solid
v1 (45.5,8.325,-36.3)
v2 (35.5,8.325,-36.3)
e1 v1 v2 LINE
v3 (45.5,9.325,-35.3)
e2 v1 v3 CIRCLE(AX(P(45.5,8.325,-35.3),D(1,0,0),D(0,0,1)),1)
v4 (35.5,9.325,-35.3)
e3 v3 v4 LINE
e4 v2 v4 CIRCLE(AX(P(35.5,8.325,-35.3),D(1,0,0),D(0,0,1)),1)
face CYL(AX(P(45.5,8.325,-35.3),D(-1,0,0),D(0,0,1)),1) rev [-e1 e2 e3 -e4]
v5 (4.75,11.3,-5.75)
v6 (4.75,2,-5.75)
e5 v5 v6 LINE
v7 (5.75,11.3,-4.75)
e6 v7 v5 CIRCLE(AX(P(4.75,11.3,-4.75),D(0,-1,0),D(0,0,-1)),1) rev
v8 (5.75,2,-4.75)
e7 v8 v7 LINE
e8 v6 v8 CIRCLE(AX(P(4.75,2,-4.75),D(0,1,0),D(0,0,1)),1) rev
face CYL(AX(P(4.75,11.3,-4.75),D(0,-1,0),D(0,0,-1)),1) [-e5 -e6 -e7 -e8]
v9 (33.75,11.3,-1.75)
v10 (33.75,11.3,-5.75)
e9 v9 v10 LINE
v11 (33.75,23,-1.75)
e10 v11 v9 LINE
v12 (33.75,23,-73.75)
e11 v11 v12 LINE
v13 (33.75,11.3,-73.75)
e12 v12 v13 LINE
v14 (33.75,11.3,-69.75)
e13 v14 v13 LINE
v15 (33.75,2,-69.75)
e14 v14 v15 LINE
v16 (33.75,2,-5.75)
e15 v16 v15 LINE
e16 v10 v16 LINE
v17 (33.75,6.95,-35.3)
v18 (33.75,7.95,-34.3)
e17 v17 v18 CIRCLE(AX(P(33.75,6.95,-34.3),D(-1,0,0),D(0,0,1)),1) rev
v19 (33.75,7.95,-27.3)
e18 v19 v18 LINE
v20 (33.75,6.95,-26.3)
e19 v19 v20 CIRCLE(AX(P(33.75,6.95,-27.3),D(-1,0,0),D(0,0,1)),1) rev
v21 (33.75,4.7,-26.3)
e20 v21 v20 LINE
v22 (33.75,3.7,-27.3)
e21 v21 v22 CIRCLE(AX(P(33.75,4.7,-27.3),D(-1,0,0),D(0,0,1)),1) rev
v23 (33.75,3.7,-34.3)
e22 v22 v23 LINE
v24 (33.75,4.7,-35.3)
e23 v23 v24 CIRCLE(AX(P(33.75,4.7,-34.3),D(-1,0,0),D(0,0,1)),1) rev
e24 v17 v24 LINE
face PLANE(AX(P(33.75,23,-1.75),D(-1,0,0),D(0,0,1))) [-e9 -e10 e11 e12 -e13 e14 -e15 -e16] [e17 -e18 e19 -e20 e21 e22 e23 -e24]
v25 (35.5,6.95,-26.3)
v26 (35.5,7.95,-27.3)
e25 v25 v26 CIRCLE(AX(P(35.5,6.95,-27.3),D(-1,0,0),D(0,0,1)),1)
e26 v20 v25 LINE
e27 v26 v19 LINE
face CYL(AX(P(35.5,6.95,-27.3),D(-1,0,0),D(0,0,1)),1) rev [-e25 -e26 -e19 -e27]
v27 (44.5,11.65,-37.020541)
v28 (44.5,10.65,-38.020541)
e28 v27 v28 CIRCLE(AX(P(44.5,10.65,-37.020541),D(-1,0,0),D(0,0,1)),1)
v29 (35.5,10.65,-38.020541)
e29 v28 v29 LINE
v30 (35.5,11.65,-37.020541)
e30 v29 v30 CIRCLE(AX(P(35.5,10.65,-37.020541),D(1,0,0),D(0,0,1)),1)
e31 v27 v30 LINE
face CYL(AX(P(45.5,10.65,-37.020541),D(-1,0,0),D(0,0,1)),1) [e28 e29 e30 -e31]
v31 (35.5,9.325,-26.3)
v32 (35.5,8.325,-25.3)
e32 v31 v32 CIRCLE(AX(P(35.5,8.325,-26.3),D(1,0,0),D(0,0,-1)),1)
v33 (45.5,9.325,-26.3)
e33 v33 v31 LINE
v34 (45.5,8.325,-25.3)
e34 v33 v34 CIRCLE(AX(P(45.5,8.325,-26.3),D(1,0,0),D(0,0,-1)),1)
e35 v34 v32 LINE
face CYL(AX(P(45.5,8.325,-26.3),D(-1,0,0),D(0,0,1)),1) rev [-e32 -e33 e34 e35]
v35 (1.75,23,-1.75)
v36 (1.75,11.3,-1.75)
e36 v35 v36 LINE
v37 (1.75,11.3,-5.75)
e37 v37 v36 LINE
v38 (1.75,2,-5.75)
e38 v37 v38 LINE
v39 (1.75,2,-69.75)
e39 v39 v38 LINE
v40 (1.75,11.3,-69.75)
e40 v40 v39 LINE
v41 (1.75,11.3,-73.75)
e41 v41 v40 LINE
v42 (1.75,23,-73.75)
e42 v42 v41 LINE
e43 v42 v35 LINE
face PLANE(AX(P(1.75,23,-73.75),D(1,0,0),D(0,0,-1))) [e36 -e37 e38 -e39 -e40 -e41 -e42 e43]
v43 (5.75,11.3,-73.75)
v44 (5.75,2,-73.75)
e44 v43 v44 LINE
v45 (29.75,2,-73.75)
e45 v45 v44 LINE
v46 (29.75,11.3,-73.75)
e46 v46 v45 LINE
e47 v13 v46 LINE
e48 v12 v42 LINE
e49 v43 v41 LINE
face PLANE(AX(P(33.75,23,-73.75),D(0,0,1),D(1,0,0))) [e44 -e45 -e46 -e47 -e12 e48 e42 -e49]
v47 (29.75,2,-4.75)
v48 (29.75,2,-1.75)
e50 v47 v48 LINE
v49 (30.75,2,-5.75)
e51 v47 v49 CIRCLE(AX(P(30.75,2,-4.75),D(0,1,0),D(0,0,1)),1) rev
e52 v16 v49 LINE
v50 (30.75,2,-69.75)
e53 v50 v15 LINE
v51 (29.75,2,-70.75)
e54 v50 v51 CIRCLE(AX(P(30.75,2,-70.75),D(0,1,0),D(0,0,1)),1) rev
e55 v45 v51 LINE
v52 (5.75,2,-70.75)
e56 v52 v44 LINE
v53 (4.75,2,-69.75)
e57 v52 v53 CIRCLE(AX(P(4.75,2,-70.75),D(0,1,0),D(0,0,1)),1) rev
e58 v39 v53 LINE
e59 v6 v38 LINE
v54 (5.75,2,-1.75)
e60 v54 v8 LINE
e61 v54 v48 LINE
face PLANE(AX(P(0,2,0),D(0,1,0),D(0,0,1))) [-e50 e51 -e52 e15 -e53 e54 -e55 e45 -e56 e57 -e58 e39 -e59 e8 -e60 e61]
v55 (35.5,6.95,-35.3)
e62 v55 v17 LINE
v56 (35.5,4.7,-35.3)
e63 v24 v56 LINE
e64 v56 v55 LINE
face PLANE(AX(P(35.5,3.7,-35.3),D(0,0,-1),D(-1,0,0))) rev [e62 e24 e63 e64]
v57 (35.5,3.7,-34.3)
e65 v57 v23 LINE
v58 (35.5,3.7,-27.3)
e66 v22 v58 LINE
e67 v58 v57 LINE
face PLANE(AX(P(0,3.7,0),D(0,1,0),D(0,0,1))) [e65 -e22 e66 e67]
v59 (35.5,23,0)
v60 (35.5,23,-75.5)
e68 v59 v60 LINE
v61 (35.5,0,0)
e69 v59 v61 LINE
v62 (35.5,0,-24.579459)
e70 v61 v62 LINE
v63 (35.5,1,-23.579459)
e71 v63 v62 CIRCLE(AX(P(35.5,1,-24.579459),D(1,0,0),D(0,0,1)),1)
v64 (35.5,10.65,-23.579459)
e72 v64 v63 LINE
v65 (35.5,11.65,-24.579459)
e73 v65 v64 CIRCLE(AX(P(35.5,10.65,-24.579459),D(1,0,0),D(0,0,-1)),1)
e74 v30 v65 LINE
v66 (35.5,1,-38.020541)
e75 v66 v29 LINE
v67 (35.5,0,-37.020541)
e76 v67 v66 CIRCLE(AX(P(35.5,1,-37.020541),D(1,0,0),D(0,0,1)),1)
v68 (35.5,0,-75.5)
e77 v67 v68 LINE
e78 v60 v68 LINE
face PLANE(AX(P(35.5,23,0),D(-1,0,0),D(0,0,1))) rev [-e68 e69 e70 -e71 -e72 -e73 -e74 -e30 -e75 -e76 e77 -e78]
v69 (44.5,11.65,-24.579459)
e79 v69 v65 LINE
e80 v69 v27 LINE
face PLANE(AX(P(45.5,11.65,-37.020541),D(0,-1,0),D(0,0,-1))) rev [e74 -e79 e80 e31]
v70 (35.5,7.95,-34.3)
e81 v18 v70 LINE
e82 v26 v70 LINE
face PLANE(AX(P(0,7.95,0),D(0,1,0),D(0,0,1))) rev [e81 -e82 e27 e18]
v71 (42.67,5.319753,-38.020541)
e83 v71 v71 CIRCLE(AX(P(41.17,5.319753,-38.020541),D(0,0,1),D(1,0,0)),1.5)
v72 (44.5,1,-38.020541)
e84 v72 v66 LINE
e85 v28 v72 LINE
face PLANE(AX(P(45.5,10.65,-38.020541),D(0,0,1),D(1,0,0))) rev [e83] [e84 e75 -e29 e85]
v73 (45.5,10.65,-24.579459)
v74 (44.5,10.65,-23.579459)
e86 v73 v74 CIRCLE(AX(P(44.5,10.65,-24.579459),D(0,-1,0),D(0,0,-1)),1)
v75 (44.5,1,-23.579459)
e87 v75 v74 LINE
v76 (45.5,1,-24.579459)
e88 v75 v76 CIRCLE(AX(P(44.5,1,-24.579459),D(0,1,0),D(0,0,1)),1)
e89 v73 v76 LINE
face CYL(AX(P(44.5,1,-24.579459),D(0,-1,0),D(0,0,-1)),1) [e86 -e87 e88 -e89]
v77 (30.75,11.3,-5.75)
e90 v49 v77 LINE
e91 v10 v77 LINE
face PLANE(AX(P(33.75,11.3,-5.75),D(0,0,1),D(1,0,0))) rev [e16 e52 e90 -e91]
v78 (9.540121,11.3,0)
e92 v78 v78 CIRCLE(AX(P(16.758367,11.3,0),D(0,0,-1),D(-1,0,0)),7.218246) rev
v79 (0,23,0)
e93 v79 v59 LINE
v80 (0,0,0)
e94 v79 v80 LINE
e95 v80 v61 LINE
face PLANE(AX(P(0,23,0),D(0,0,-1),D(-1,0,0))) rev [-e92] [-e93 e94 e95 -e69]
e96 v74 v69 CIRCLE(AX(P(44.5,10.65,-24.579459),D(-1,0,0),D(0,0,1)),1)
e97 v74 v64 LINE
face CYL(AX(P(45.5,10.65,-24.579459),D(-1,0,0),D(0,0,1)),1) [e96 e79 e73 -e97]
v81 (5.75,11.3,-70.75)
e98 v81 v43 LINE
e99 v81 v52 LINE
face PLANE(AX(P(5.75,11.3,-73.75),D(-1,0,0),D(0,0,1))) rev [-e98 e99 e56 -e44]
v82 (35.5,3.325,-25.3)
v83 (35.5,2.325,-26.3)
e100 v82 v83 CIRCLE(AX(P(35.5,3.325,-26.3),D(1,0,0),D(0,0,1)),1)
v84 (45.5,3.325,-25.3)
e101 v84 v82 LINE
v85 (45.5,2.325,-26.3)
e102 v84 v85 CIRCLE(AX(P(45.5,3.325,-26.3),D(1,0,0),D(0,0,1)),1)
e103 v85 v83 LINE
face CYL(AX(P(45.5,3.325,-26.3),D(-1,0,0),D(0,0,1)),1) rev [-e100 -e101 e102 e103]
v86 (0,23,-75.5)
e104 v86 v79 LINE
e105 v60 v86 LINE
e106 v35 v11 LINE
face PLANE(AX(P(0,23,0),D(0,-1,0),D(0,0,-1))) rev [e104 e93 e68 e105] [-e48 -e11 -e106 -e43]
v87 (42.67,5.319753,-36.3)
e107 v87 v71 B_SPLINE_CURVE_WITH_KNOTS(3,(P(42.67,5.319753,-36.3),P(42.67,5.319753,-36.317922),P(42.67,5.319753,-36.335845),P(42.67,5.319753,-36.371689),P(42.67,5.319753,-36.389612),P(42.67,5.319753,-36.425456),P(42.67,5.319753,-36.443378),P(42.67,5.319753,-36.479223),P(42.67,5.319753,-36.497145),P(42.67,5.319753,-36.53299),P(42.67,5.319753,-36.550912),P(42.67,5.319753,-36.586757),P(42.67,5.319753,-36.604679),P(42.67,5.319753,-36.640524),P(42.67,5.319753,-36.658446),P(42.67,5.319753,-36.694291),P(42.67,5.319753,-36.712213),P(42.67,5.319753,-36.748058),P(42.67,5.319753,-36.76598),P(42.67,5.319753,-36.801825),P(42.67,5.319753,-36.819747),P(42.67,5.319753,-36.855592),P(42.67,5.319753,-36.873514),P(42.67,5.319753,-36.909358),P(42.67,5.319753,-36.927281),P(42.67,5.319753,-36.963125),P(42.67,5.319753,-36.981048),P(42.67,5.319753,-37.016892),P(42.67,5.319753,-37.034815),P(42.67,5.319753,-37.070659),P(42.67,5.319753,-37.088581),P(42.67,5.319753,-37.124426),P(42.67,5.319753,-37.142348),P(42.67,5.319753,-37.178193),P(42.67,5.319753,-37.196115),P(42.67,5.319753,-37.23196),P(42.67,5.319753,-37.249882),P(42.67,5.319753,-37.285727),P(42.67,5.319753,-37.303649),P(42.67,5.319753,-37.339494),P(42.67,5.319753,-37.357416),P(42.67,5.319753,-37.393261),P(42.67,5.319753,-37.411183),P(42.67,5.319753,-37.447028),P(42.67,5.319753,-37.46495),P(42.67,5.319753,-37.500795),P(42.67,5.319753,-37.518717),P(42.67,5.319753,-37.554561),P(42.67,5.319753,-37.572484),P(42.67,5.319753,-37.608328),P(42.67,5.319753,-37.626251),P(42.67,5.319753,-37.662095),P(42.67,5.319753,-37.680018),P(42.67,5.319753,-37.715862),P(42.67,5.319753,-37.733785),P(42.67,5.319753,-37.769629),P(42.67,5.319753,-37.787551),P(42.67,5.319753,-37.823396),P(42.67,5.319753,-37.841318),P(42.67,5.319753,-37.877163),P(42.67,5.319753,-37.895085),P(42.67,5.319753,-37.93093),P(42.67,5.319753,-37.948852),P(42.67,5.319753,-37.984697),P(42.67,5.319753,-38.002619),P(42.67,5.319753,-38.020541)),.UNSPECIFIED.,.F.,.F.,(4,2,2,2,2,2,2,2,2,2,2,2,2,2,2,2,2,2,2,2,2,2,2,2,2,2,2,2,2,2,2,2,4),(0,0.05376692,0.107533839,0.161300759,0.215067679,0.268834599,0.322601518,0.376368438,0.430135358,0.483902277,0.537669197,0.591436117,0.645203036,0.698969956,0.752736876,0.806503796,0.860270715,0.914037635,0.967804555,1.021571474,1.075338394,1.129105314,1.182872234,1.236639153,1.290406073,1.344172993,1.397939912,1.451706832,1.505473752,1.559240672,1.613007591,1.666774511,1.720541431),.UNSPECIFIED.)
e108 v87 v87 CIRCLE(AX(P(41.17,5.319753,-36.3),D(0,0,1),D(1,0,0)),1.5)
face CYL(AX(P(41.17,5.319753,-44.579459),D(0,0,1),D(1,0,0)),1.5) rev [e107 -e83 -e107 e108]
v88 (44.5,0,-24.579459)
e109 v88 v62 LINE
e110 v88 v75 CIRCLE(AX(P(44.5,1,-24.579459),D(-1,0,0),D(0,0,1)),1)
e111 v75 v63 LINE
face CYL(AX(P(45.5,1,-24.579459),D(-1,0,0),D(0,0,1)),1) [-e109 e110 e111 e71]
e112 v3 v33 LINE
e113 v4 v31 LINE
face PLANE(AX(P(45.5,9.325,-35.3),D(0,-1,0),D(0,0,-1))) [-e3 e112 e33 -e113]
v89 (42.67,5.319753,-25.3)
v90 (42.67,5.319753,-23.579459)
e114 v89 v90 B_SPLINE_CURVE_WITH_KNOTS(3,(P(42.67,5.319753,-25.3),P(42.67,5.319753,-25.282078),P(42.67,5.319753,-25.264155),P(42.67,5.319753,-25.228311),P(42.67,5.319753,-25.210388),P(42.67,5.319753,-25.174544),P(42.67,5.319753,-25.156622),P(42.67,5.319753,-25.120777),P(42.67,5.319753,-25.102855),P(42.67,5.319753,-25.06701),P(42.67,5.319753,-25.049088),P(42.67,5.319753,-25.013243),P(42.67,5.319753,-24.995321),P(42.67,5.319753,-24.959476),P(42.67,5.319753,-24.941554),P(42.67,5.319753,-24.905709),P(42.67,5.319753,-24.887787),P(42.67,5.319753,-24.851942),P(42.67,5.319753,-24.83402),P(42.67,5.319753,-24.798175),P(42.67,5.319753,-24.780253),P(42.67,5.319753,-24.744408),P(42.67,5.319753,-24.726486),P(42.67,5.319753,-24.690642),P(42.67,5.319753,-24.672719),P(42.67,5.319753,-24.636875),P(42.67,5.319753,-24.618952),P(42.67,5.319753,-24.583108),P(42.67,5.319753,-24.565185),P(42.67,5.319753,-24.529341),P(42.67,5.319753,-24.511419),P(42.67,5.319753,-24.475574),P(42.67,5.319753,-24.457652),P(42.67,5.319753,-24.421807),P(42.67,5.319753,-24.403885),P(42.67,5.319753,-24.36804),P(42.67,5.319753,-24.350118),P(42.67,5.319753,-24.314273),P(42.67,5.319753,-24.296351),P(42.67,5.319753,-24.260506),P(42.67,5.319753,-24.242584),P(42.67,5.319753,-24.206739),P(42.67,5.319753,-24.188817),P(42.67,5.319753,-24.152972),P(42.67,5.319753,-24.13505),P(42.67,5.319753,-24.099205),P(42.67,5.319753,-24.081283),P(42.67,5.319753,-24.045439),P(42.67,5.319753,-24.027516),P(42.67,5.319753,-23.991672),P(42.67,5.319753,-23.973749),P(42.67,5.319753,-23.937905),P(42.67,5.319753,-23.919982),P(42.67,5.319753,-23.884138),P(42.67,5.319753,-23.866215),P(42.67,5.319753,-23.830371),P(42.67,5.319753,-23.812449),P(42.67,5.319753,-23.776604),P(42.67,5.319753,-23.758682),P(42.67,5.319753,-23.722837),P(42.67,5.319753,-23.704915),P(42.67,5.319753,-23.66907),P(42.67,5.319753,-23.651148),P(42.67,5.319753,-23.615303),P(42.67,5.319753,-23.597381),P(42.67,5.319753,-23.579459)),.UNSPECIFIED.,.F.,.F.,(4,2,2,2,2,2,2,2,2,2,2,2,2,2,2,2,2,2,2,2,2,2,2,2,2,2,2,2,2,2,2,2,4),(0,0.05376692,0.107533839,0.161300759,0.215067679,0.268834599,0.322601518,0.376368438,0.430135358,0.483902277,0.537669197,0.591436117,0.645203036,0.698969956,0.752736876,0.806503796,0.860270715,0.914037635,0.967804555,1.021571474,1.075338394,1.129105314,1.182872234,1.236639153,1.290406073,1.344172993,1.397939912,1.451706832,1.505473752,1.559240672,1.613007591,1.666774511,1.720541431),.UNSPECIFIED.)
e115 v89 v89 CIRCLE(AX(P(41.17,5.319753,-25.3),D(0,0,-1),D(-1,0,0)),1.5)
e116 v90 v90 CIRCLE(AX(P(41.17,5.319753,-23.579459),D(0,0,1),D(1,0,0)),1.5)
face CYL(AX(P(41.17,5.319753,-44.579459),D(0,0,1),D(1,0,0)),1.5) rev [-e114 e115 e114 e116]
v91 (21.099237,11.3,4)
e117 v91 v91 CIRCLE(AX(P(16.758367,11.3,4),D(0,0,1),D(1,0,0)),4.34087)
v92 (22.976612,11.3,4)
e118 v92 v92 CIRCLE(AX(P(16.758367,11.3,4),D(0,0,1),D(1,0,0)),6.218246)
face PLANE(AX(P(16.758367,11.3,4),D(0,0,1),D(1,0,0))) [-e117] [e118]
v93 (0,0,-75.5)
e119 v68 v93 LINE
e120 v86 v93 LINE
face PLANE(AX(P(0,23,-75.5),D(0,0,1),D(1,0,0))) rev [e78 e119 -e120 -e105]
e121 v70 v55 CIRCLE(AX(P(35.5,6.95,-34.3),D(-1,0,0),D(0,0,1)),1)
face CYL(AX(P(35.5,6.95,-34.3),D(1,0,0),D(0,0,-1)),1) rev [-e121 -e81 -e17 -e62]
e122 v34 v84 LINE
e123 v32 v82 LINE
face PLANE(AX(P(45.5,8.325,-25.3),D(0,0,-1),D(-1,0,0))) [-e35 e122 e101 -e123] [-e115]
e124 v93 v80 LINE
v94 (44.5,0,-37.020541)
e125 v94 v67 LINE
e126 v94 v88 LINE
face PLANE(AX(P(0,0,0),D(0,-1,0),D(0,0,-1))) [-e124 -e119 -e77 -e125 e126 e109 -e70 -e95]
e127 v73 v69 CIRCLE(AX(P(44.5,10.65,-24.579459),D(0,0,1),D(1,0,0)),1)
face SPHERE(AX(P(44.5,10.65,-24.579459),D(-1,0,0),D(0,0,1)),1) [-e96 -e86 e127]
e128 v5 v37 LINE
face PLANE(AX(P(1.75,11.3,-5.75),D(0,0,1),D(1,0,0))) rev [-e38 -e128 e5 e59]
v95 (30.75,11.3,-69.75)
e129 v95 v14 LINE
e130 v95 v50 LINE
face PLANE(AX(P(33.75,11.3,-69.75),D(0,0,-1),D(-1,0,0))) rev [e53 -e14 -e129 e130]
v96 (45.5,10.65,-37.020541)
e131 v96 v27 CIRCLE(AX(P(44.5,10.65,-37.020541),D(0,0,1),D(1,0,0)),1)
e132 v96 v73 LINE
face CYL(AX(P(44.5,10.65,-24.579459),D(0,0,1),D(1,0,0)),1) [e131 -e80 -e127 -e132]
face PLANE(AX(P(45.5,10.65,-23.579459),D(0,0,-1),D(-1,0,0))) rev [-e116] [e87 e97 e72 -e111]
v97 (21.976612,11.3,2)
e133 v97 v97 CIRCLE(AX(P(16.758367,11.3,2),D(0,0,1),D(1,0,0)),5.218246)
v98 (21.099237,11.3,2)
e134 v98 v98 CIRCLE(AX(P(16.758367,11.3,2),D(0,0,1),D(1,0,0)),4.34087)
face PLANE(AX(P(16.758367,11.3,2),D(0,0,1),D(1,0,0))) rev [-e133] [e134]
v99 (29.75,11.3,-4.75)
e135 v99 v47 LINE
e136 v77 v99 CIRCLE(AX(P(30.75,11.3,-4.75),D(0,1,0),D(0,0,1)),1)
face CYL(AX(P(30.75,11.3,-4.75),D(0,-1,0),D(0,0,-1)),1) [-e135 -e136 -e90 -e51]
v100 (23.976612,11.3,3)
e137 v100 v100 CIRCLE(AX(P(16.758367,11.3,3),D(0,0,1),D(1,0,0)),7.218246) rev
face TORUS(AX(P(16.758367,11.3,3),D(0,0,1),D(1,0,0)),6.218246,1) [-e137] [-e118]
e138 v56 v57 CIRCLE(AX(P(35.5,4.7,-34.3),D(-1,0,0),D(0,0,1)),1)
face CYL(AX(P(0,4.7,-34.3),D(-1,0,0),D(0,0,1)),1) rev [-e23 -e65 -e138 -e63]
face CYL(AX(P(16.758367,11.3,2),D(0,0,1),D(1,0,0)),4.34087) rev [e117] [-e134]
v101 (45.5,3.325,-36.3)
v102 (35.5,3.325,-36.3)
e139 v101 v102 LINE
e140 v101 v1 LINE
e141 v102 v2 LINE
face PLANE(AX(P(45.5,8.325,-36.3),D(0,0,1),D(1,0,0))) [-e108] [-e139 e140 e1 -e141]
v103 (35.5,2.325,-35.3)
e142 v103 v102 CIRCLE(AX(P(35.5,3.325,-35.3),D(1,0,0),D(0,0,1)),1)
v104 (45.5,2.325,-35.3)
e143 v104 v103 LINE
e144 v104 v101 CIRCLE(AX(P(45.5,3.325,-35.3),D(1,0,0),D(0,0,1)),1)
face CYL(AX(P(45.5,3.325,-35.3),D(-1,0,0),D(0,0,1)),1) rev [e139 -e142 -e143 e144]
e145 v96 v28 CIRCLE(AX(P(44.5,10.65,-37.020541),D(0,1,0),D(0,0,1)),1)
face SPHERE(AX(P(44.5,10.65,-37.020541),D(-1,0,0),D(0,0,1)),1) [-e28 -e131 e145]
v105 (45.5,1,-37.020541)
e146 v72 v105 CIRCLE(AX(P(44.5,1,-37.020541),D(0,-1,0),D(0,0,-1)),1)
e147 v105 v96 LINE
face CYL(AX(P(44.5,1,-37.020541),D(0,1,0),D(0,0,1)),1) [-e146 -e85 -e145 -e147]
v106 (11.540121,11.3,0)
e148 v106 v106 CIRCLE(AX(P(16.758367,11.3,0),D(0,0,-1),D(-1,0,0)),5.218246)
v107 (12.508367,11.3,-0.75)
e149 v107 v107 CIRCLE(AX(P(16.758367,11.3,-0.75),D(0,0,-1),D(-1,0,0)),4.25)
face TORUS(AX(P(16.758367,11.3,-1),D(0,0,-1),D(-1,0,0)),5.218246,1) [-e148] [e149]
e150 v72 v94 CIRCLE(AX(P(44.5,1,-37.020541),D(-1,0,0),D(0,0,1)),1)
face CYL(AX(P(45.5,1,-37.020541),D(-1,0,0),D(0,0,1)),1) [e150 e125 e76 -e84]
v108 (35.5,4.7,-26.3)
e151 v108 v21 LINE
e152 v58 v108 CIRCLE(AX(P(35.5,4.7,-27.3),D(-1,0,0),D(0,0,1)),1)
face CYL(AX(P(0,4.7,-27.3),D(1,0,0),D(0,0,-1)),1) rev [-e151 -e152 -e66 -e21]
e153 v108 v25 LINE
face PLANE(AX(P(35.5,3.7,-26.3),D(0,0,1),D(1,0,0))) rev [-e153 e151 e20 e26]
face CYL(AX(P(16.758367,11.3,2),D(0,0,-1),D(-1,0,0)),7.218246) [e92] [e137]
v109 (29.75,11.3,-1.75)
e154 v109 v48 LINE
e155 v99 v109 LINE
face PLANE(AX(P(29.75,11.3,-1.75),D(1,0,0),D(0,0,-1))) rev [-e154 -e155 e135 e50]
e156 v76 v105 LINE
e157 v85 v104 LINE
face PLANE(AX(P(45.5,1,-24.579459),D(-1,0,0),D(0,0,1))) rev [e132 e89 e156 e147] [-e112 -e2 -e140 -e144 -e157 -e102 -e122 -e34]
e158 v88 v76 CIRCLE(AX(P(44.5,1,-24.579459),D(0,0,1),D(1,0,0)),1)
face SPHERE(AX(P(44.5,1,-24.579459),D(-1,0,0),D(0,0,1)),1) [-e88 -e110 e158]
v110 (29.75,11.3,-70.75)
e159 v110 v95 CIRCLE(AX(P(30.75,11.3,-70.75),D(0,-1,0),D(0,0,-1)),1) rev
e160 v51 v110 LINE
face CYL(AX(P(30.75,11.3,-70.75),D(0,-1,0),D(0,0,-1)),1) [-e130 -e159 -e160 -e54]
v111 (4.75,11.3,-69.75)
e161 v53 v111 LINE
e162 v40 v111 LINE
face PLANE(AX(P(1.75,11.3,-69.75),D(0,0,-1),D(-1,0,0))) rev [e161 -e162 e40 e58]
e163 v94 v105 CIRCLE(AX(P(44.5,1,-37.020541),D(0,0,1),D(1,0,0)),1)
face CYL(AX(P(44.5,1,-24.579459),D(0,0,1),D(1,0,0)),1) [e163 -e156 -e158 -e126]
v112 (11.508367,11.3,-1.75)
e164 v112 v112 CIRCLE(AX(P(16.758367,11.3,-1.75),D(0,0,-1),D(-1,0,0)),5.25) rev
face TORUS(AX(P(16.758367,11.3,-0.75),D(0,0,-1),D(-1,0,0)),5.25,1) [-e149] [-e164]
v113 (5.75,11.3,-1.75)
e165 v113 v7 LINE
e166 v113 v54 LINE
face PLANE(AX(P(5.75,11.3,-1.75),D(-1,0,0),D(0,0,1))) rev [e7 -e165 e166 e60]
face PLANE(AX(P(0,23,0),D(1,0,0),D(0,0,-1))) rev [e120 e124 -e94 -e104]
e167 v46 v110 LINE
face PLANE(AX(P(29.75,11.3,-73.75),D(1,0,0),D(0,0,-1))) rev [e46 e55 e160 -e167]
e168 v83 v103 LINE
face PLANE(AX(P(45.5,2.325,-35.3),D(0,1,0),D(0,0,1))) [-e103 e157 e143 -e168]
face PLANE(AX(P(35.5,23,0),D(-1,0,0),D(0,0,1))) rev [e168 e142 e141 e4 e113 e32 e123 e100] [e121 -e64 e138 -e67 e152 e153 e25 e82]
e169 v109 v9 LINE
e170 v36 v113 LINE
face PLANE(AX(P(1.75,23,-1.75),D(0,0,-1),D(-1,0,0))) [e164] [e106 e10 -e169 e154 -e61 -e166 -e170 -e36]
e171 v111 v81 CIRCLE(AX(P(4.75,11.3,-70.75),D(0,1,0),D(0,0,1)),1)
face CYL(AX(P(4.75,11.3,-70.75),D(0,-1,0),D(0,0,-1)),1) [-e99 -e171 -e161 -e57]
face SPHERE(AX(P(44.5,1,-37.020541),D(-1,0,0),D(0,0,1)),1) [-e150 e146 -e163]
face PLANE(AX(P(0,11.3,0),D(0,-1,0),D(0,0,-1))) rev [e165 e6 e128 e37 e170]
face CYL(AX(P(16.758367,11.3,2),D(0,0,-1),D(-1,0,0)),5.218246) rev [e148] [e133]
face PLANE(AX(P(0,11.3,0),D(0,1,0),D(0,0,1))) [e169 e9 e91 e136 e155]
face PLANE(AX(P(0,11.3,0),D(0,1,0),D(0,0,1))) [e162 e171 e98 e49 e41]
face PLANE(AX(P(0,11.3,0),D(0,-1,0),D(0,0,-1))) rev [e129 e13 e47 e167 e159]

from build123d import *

# Parameters (mm, degrees)
SKETCH1_W           = 35.5
SKETCH1_H           = 75.5
BOSS_EXTRUDE2_DEPTH = 23
CUT_EXTRUDE1_DEPTH  = 21
SKETCH2_W           = 4
SKETCH2_H           = 4
BOSS_EXTRUDE3_DEPTH = 9.3
CUT_EXTRUDE2_START  = -15.05
SKETCH3_W           = 3.25
SKETCH3_H           = 9
CUT_EXTRUDE2_DEPTH  = 4.25
SKETCH6_R           = 4.25
CUT_EXTRUDE4_DEPTH  = 1.75
FILLET1_R           = 1
FILLET2_R           = 1
SKETCH7_R           = 7.218245837
SKETCH7_R_2         = 5.218245837
BOSS_EXTRUDE4_DEPTH = 2
SKETCH9_R           = 7.218245837
BOSS_EXTRUDE5_DEPTH = 2
FILLET4_R           = 1
SKETCH10_R          = 4.340870449
CUT_EXTRUDE5_DEPTH  = 2
FILLET5_R           = 1
FILLET6_R           = 1
FILLET7_R           = 1
FILLET9_R           = 1
BOSS_EXTRUDE7_DEPTH = 10
FILLET10_R          = 1
SKETCH13_R          = 1.5
CUT_EXTRUDE6_DEPTH  = 21


with BuildPart() as part:
    # Sketch1 → Boss-Extrude2 (new body)
    with BuildSketch(Plane(origin=(0, 0, 0), x_dir=(1, 0, 0), z_dir=(0, 1, 0))):
        with Locations((17.75, 37.75)):
            Rectangle(SKETCH1_W, SKETCH1_H)
    extrude(amount=BOSS_EXTRUDE2_DEPTH)

    # 3DSketch1 → Cut-Extrude1 (cut)
    with BuildSketch(Plane(origin=(33.75, 23, -1.75), x_dir=(-0.40613846605344744, 0, -0.9138115486202573), z_dir=(0, 1, 0))):
        Polygon((0, 0), (65.794431501, -29.241969556), (78.790862414, 0), (12.996430914, 29.241969556), align=None)
    extrude(amount=-CUT_EXTRUDE1_DEPTH, mode=Mode.SUBTRACT)

    # Sketch2 → Boss-Extrude3 (add)
    with BuildSketch(Plane(origin=(0, 2, 0), x_dir=(1, 0, 0), z_dir=(0, 1, 0))):
        with Locations((3.75, 71.75)):
            Rectangle(SKETCH2_W, SKETCH2_H)
        with Locations((31.75, 71.75)):
            Rectangle(SKETCH2_W, SKETCH2_H)
        with Locations((31.75, 3.75)):
            Rectangle(SKETCH2_W, SKETCH2_H)
        with Locations((3.75, 3.75)):
            Rectangle(SKETCH2_W, SKETCH2_H)
    extrude(amount=BOSS_EXTRUDE3_DEPTH)

    # Sketch3 → Cut-Extrude2 (cut)
    with BuildSketch(Plane(origin=(0, 23, 0), x_dir=(1, 0, 0), z_dir=(0, 1, 0)).offset(CUT_EXTRUDE2_START)):
        with Locations((33.875, 30.8)):
            Rectangle(SKETCH3_W, SKETCH3_H)
    extrude(amount=-CUT_EXTRUDE2_DEPTH, mode=Mode.SUBTRACT)

    # Sketch6 → Cut-Extrude4 (cut)
    with BuildSketch(Plane.XY):
        with Locations((16.758366621, 11.3)):
            Circle(SKETCH6_R)
    extrude(amount=-CUT_EXTRUDE4_DEPTH, mode=Mode.SUBTRACT)

    # Fillet1
    fillet1_edges = [part.edges().sort_by_distance(p)[0] for p in [
        (12.508366621, 11.3, -1.75),
    ]]
    fillet(fillet1_edges, radius=FILLET1_R)

    # Fillet2
    # the kernel refuses this fillet: 1 mm, written as the material it takes off along each edge
    with BuildSketch(Plane(origin=(16.758366621, 11.3, 0), x_dir=(1, 0, 0), z_dir=(0, -1, 0))) as fillet2_piece_1:
        with BuildLine():
            CenterArc((5.218245837, -1), FILLET2_R, 90, 75.522487814)
            Line((5.218245837, 0), (5.218245837, 0.02))
            Line((5.218245837, 0.02), (4.25, 0.02))
            Line((4.25, 0.02), (4.23, 0))
            ThreePointArc((4.23, 0), (4.23, -0.375), (4.230635083, -0.745))
            Line((4.230635083, -0.745), (4.25, -0.75))
        make_face()
    revolve(axis=Axis((16.758366621, 11.3, 0), (0, 0, 1)), mode=Mode.SUBTRACT)

    # Sketch7 → Boss-Extrude4 (add)
    with BuildSketch(Plane.XY):
        with Locations(Location((16.758366621, 11.3, 0), (0, 0, 180))):
            Circle(SKETCH7_R)
        with Locations(Location((16.758366621, 11.3, 0), (0, 0, 180))):
            Circle(SKETCH7_R_2, mode=Mode.SUBTRACT)
    extrude(amount=BOSS_EXTRUDE4_DEPTH)

    # Sketch9 → Boss-Extrude5 (add)
    with BuildSketch(Plane.XY.offset(2)):
        with Locations(Location((16.758366621, 11.3, 0), (0, 0, 180))):
            Circle(SKETCH9_R)
    extrude(amount=BOSS_EXTRUDE5_DEPTH)

    # Fillet4
    fillet4_edges = [part.edges().sort_by_distance(p)[0] for p in [
        (23.976612458, 11.3, 4),
    ]]
    fillet(fillet4_edges, radius=FILLET4_R)

    # Sketch10 → Cut-Extrude5 (cut)
    with BuildSketch(Plane.XY.offset(4)):
        with Locations((16.758366621, 11.3)):
            Circle(SKETCH10_R)
    extrude(amount=-CUT_EXTRUDE5_DEPTH, mode=Mode.SUBTRACT)

    # Fillet5
    fillet5_edges = [part.edges().sort_by_distance(p)[0] for p in [
        (34.625, 3.7, -26.3),
    ]]
    fillet(fillet5_edges, radius=FILLET5_R)

    # Fillet6
    fillet6_edges = [part.edges().sort_by_distance(p)[0] for p in [
        (34.625, 3.7, -35.3),
    ]]
    fillet(fillet6_edges, radius=FILLET6_R)

    # Fillet7
    fillet7_edges = [part.edges().sort_by_distance(p)[0] for p in [
        (5.75, 6.65, -69.75),
        (29.75, 6.65, -69.75),
        (29.75, 6.65, -5.75),
        (5.75, 6.65, -5.75),
    ]]
    fillet(fillet7_edges, radius=FILLET7_R)

    # Fillet9
    fillet9_edges = [part.edges().sort_by_distance(p)[0] for p in [
        (34.625, 7.95, -26.3),
        (34.625, 7.95, -35.3),
    ]]
    fillet(fillet9_edges, radius=FILLET9_R)

    # Sketch12 → Boss-Extrude7 (add)
    with BuildSketch(Plane(origin=(35.5, 0, 0), x_dir=(0, 0, -1), z_dir=(1, 0, 0))):
        with BuildLine():
            Line((37.020541431, 11.65), (24.579458569, 11.65))
            ThreePointArc((24.579458569, 11.65), (23.872351788, 11.357106781), (23.579458569, 10.65))
            Line((23.579458569, 10.65), (23.579458569, 1))
            ThreePointArc((23.579458569, 1), (23.872351788, 0.292893219), (24.579458569, 0))
            Line((24.579458569, 0), (37.020541431, 0))
            ThreePointArc((37.020541431, 0), (37.727648212, 0.292893219), (38.020541431, 1))
            Line((38.020541431, 1), (38.020541431, 10.65))
            ThreePointArc((38.020541431, 10.65), (37.727648212, 11.357106781), (37.020541431, 11.65))
        make_face()
        with BuildLine():
            Line((35.3, 9.325), (26.3, 9.325))
            ThreePointArc((26.3, 9.325), (25.592893219, 9.032106781), (25.3, 8.325))
            Line((25.3, 8.325), (25.3, 3.325))
            ThreePointArc((25.3, 3.325), (25.592893219, 2.617893219), (26.3, 2.325))
            Line((26.3, 2.325), (35.3, 2.325))
            ThreePointArc((35.3, 2.325), (36.007106781, 2.617893219), (36.3, 3.325))
            Line((36.3, 3.325), (36.3, 8.325))
            ThreePointArc((36.3, 8.325), (36.007106781, 9.032106781), (35.3, 9.325))
        make_face(mode=Mode.SUBTRACT)
    extrude(amount=BOSS_EXTRUDE7_DEPTH)

    # Fillet10
    fillet10_edges = [part.edges().sort_by_distance(p)[0] for p in [
        (45.5, 0.292893219, -23.872351788),
        (45.5, 0, -30.8),
        (45.5, 0.292893219, -37.727648212),
        (45.5, 5.825, -38.020541431),
        (45.5, 11.357106781, -37.727648212),
        (45.5, 11.65, -30.8),
        (45.5, 11.357106781, -23.872351788),
        (45.5, 5.825, -23.579458569),
    ]]
    fillet(fillet10_edges, radius=FILLET10_R)

    # Sketch13 → Cut-Extrude6 (cut)
    with BuildSketch(Plane.XY.offset(-23.579458569)):
        with Locations((41.17, 5.31975288)):
            Circle(SKETCH13_R)
    extrude(amount=-CUT_EXTRUDE6_DEPTH, mode=Mode.SUBTRACT)


solid = part.part
